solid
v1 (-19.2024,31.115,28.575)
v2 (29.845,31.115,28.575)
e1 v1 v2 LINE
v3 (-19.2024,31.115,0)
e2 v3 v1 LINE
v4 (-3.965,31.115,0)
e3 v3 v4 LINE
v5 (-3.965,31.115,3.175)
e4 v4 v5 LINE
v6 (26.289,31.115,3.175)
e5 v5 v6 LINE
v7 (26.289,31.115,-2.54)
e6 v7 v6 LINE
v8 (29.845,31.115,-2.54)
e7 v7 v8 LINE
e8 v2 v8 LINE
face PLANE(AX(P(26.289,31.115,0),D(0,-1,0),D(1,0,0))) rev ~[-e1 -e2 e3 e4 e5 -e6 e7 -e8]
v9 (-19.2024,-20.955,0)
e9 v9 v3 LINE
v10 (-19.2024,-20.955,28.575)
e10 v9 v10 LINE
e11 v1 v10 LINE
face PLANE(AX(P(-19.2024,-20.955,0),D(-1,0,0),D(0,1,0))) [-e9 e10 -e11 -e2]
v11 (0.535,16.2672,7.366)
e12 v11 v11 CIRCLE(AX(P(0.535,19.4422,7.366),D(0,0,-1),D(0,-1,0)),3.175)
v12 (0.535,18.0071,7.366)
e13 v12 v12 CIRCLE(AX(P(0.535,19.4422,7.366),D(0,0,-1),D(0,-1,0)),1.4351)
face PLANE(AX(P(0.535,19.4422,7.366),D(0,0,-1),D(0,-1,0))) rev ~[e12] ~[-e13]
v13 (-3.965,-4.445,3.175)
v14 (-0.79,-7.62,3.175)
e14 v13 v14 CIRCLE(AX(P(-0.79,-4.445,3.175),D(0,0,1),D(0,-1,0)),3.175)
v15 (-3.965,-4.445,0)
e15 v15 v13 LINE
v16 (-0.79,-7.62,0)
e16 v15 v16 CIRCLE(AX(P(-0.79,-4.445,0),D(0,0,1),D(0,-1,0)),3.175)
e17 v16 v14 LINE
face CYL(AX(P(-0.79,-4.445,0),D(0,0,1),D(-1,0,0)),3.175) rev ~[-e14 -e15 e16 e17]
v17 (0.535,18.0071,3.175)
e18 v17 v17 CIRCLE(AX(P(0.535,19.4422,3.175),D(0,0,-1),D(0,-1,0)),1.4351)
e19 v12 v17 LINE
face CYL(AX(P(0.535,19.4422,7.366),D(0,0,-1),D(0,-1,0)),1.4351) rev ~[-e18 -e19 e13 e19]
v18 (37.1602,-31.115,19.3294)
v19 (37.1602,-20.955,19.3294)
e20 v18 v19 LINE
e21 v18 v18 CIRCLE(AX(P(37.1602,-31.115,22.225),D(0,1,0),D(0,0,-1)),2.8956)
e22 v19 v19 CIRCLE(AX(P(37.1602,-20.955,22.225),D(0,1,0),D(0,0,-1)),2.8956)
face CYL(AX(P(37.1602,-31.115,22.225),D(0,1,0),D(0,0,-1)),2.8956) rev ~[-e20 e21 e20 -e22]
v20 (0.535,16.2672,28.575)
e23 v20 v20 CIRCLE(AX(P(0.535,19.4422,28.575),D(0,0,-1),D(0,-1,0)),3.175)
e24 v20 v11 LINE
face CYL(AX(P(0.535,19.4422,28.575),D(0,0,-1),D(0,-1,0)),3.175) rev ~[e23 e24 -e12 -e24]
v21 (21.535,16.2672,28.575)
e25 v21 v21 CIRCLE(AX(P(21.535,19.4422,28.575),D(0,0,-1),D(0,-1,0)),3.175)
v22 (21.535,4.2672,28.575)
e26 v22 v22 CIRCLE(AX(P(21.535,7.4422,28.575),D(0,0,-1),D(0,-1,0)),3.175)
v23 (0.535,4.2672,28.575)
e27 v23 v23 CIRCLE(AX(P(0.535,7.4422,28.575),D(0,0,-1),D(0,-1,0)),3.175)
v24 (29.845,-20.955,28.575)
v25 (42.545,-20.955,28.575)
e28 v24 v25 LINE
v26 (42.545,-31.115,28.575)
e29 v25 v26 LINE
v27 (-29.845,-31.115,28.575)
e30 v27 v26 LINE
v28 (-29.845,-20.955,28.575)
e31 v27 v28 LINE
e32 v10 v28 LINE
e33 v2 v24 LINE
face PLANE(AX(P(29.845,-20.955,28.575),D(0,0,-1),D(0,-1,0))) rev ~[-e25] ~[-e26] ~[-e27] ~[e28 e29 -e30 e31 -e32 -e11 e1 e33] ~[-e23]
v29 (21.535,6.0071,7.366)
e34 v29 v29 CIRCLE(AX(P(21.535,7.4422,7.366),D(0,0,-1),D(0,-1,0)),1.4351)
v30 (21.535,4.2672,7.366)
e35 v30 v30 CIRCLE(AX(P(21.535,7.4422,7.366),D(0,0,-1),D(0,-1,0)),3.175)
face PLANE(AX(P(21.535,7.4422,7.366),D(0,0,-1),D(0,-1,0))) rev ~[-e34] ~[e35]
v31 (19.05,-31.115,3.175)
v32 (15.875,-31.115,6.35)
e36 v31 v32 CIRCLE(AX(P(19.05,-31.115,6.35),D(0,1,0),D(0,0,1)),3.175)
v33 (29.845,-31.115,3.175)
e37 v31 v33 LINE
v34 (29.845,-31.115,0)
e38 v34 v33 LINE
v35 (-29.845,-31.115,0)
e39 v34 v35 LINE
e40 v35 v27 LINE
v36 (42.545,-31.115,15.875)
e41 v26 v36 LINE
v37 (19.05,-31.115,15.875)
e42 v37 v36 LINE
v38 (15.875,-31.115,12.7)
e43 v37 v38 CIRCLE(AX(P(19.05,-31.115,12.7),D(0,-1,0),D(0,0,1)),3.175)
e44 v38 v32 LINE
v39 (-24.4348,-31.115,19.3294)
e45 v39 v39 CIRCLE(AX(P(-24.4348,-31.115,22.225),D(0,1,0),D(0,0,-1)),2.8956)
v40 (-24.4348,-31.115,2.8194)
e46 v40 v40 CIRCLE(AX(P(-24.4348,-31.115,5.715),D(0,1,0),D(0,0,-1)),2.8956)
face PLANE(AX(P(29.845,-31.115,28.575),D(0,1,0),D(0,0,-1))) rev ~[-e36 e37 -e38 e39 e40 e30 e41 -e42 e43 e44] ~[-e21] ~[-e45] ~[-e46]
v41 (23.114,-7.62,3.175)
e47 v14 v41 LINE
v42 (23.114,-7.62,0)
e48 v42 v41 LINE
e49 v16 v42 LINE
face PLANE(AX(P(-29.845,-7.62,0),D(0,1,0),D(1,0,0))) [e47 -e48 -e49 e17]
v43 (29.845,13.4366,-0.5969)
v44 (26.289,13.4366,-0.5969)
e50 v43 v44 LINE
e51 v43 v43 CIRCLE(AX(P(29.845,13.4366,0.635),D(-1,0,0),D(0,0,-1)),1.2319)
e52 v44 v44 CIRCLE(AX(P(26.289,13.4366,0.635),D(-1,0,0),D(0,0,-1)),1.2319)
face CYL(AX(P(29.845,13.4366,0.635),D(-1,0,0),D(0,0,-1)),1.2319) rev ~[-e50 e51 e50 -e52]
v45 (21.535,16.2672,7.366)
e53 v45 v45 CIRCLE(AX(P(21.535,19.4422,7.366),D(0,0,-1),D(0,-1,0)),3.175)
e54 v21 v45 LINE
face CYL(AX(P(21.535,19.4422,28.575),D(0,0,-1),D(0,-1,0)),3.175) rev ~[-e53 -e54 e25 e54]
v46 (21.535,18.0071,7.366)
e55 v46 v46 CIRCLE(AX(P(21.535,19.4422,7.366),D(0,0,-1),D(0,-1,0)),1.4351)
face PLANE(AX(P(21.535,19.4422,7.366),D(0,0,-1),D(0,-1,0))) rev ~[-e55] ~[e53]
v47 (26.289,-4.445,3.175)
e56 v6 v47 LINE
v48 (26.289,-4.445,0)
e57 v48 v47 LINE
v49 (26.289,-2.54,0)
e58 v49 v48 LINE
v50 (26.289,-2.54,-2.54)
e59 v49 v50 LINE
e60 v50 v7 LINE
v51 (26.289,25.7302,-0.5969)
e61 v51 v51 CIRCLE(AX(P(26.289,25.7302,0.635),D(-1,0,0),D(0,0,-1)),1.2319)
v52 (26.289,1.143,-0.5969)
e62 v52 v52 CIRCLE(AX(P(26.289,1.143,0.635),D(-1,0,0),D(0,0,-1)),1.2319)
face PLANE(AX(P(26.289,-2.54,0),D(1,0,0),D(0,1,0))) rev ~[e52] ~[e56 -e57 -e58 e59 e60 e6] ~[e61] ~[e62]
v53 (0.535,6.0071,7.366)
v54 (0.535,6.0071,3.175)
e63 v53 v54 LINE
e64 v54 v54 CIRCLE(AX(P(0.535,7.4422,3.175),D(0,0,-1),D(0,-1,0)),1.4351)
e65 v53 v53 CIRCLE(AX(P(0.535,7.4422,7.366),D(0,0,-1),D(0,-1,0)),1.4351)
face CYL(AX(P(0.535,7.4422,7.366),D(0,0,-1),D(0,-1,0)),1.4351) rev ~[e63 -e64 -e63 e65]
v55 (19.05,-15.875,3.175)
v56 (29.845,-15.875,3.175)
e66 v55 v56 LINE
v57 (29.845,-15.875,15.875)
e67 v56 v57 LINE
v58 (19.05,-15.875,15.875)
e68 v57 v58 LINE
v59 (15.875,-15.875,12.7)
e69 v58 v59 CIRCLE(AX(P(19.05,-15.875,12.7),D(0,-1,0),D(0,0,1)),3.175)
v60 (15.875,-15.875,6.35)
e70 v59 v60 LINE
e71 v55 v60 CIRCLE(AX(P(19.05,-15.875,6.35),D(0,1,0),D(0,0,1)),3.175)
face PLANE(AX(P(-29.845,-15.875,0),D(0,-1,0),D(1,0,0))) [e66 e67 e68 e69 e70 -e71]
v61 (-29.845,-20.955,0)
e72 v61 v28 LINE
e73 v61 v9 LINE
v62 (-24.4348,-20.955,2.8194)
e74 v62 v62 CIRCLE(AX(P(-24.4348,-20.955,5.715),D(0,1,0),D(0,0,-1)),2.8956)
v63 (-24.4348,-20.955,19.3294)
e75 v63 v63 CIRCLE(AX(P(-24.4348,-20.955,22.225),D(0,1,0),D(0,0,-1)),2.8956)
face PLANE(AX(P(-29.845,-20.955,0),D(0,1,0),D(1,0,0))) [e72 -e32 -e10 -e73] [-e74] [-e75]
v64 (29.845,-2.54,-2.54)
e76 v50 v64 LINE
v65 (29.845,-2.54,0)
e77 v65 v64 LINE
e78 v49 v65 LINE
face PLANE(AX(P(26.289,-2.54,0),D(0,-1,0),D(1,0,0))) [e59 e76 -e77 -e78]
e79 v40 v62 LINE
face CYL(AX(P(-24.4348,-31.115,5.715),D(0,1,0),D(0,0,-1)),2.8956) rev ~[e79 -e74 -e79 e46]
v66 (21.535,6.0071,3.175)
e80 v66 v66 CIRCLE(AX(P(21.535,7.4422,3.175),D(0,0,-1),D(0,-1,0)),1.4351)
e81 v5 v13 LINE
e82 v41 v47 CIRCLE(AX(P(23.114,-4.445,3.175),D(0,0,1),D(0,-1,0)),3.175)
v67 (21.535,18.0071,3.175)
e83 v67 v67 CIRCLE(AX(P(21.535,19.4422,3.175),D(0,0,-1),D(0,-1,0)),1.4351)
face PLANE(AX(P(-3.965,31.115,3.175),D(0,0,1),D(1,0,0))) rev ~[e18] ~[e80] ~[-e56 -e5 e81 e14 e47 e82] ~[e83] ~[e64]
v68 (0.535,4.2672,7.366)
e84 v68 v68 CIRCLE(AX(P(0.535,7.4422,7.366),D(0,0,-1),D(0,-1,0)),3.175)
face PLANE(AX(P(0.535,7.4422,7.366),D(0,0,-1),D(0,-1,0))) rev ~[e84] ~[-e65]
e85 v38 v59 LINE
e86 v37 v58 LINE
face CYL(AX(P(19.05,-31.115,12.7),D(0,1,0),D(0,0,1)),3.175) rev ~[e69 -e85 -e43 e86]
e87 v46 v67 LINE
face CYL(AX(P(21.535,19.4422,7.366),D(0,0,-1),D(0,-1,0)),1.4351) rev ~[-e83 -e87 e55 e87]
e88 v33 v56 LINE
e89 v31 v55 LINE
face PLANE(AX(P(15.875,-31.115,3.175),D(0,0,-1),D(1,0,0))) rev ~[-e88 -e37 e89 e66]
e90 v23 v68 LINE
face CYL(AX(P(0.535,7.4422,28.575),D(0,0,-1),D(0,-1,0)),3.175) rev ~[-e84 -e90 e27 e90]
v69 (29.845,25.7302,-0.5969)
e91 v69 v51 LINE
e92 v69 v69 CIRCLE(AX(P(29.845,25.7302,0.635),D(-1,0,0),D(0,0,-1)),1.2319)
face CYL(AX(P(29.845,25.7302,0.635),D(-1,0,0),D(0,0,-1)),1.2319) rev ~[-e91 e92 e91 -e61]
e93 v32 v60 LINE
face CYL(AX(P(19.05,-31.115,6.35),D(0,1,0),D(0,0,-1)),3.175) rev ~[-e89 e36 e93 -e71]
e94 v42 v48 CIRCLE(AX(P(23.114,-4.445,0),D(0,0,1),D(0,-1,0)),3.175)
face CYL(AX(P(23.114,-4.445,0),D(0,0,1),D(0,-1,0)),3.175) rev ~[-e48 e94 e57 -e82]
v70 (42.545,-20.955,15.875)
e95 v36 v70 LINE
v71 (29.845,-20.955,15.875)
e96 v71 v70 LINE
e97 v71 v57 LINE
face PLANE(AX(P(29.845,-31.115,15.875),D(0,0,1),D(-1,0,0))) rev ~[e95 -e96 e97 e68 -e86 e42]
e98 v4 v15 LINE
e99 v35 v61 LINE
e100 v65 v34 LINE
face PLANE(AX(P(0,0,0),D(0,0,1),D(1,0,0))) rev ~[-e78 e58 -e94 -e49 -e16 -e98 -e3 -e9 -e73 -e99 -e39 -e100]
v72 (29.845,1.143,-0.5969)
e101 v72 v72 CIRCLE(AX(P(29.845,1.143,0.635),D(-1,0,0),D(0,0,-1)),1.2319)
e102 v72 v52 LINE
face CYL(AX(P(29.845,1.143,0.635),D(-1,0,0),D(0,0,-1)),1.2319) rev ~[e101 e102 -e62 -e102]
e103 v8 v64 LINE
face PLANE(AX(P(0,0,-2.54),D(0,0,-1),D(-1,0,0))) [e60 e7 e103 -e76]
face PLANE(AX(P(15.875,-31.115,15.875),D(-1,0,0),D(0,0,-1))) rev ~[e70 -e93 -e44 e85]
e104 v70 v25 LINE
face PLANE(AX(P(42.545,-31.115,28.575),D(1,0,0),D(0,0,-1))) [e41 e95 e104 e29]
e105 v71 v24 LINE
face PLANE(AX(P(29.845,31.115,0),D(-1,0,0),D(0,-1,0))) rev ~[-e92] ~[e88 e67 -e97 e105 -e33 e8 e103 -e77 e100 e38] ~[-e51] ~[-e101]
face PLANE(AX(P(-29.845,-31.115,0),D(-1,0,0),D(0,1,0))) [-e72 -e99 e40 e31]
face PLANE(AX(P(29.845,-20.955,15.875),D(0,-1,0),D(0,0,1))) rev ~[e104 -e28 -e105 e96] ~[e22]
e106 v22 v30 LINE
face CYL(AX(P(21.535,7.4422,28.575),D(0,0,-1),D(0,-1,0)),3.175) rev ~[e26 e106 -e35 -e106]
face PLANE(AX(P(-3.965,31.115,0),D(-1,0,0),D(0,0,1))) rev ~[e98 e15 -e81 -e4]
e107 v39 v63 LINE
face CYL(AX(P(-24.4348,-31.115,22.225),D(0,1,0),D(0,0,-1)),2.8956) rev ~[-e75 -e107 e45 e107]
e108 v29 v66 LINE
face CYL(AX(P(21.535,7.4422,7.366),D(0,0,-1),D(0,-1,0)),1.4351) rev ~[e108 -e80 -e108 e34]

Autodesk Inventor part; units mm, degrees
ref_plane "XZ Plane" through (0, 0, 0) normal (0, 1, 0) x (-1, 0, 0)
ref_plane "XY Plane" through (0, 0, 0) normal (0, 0, 1) x (1, 0, 0)
sketch "Sketch1" plane through (0, 0, 0) normal (0, 0, 1) x (1, 0, 0)
  line L0 (29.845, -31.115) -> (-29.845, -31.115)
  line L1 (-29.845, -31.115) -> (-29.845, 31.115)
  line L2 (-29.845, 31.115) -> (29.845, 31.115)
  line L3 (29.845, 31.115) -> (29.845, -31.115)
  line L4 (29.845, -31.115) -> (-29.845, 31.115) construction
  line L5 (-29.845, -31.115) -> (29.845, 31.115) construction
  point P0 (0, 0)
  dimension "d0" = 59.69
  dimension "d1" = 62.23
extrude "Extrusion1" add sketch "Sketch1" along normal blind 28.575
sketch "Sketch2" plane through (-29.845, 31.115, 0) normal (0, 1, 0) x (1, 0, 0)
  line L0 (0, 0) -> (59.69, 0) projected
  line L1 (59.69, 0) -> (59.69, -28.575) projected
  line L2 (56.134, 0) -> (25.88, 0)
  line L3 (25.88, 0) -> (25.88, -3.175)
  line L4 (25.88, -3.175) -> (56.134, -3.175)
  line L5 (59.69, 0) -> (0, 0) projected
  line L6 (56.134, 0) -> (56.134, -3.175)
  point P0 (29.845, 0)
  dimension "d4" = 3.175
  dimension "d5" = 30.254
  dimension "d52" = 3.556
extrude "Extrusion2" cut sketch "Sketch2" against normal blind 38.735
sketch "Sketch3" plane through (0, 0, 0) normal (0, 0, 1) x (1, 0, 0)
  point P0 (0, 0)
sketch "Sketch4" plane through (0, 0, 28.575) normal (0, 0, 1) x (1, 0, 0)
  line L0 (0.535, 7.4422) -> (21.535, 7.4422) construction
  line L1 (21.535, 7.4422) -> (21.535, 19.4422) construction
  line L2 (21.535, 19.4422) -> (0.535, 19.4422) construction
  line L3 (0.535, 19.4422) -> (0.535, 7.4422) construction
  line L4 (-29.845, -31.115) -> (29.845, -31.115) projected
  line L5 (-3.965, 31.115) -> (-3.965, -7.62) projected
  point P0 (0, 0)
  dimension "d8" = 21
  dimension "d9" = 12
  dimension "d10" = 38.5572
  dimension "d11" = 4.5
hole "Hole1" at (0.535, 19.4422, 28.575) at (0.535, 7.4422, 28.575) at (21.535, 7.4422, 28.575) at (21.535, 19.4422, 28.575) direction (0, 0, -1) diameter 2.8702 end through all counterbore diameter 6.35 counterbore depth 21.209
fillet "Fillet1" radius 3.175 2 edges at (-3.965, -7.62, 1.5875) (26.289, -7.62, 1.5875)
sketch "Sketch5" plane through (29.845, -31.115, 28.575) normal (1, 0, 0) x (0, 0, -1)
  line L0 (0, 0) -> (12.7, 0)
  line L1 (12.7, 0) -> (12.7, 10.16)
  line L2 (12.7, 10.16) -> (0, 10.16)
  line L3 (0, 10.16) -> (0, 0)
  point P0 (28.575, 31.115)
  dimension "d20" = 12.7
  dimension "d21" = 10.16
extrude "Extrusion3" add sketch "Sketch5" along normal blind 12.7
sketch "Sketch6" plane through (-29.845, -31.115, 0) normal (0, -1, 0) x (1, 0, 0)
  line L0 (29.845, 34.29) -> (29.845, -5.715) projected
  line L1 (0, 28.575) -> (72.39, 28.575) projected
  line L2 (72.39, 28.575) -> (72.39, 15.875) projected
  line L3 (0, 0) -> (0, 28.575) projected
  point P0 (67.0052, 22.225)
  point P1 (5.4102, 22.225)
  point P2 (5.4102, 5.715)
  dimension "d39" = 6.35
  dimension "d40" = 37.1602
  dimension "d41" = 16.51
  dimension "d42" = 61.595
  dimension "d67" = 5.3848
  dimension "d68" = 5.4102
hole "Hole2" at (37.1602, -31.115, 22.225) at (-24.4348, -31.115, 22.225) at (-24.4348, -31.115, 5.715) direction (0, 1, 0) diameter 5.7912 depth 12.7 tip angle 118
sketch "Sketch7" plane through (0, 0, 0) normal (0, 0, 1) x (1, 0, 0)
  line L0 (29.845, -20.955) -> (42.545, -20.955) projected
  line L1 (-29.845, 31.115) -> (-29.845, -31.115) projected
  line L2 (-29.845, -31.115) -> (42.545, -31.115) projected
  line L3 (29.845, 31.115) -> (-29.845, 31.115) projected
  line L4 (-29.845, -20.955) -> (-19.2024, -20.955)
  line L5 (-19.2024, -20.955) -> (-19.2024, 31.115)
  line L6 (-19.2024, 31.115) -> (-29.845, 31.115)
  line L7 (-29.845, 31.115) -> (-29.845, -20.955)
  point P0 (0, 0)
  dimension "d35" = 10.6426
  dimension "d36" = 10.16
  dimension "d43" = 0
extrude "Extrusion4" cut sketch "Sketch7" along normal up to next
sketch "Sketch8" plane through (-29.845, -20.955, 28.575) normal (0, 1, 0) x (1, 0, 0)
  circle A0 centre (5.4102, 22.86) radius 2.8956 projected
  point P0 (29.845, 28.575)
sketch "Sketch9" plane through (-29.845, -31.115, 0) normal (0, -1, 0) x (1, 0, 0)
  line L0 (59.69, 15.875) -> (72.39, 15.875) projected
  line L1 (59.69, 0) -> (59.69, 15.875) projected
  line L2 (59.69, 0) -> (59.69, 28.575) construction
  line L3 (59.69, 15.875) -> (45.72, 15.875)
  line L4 (45.72, 15.875) -> (45.72, 3.175)
  line L5 (45.72, 3.175) -> (59.69, 3.175)
  line L6 (59.69, 3.175) -> (59.69, 15.875)
  line L7 (59.69, 0) -> (0, 0) construction
  point P0 (29.845, 0)
  point P1 (59.69, 3.175)
  dimension "d44" = 13.97
  dimension "d46" = 0
  dimension "d48" = 3.175
extrude "Extrusion5" cut sketch "Sketch9" against normal blind 15.24
fillet "Fillet2" radius 3.175 2 edges at (15.875, -23.495, 3.175) (15.875, -23.495, 15.875)
sketch "Sketch10" plane through (0, 0, 0) normal (0, 0, -1) x (-1, 0, 0)
  line L0 (-29.845, 31.115) -> (-29.845, -31.115) projected
  line L1 (-26.289, 31.115) -> (-29.845, 31.115) projected
  line L2 (-26.289, -4.445) -> (-26.289, 31.115) projected
  line L3 (-29.845, 31.115) -> (-26.289, 31.115)
  line L4 (-26.289, 31.115) -> (-26.289, -2.54)
  line L5 (-26.289, -2.54) -> (-29.845, -2.54)
  line L6 (-29.845, -2.54) -> (-29.845, 31.115)
  point P0 (0, 0)
  dimension "d53" = 33.655
extrude "Extrusion6" add sketch "Sketch10" along normal blind 2.54
sketch "Sketch11" plane through (29.845, -20.955, 28.575) normal (1, 0, 0) x (0, 0, -1)
  line L0 (0, 52.07) -> (31.115, 52.07) projected
  line L1 (31.115, 52.07) -> (31.115, 18.415) projected
  point P0 (28.575, 20.955)
  point P1 (27.94, 46.6852)
  point P2 (27.94, 22.098)
  point P3 (27.94, 34.3916)
  dimension "d56" = 3.175
  dimension "d57" = 5.3848
  dimension "d58" = 24.5872
  dimension "d66" = 12.2936
hole "Hole3" at (29.845, 25.7302, 0.635) at (29.845, 1.143, 0.635) at (29.845, 13.4366, 0.635) direction (-1, 0, 0) diameter 2.4638 end up to surface
equation "\"d66\" = 0.5 * d58"
properties part number "J005333" material "ALUMINUM, 6061-T651"
